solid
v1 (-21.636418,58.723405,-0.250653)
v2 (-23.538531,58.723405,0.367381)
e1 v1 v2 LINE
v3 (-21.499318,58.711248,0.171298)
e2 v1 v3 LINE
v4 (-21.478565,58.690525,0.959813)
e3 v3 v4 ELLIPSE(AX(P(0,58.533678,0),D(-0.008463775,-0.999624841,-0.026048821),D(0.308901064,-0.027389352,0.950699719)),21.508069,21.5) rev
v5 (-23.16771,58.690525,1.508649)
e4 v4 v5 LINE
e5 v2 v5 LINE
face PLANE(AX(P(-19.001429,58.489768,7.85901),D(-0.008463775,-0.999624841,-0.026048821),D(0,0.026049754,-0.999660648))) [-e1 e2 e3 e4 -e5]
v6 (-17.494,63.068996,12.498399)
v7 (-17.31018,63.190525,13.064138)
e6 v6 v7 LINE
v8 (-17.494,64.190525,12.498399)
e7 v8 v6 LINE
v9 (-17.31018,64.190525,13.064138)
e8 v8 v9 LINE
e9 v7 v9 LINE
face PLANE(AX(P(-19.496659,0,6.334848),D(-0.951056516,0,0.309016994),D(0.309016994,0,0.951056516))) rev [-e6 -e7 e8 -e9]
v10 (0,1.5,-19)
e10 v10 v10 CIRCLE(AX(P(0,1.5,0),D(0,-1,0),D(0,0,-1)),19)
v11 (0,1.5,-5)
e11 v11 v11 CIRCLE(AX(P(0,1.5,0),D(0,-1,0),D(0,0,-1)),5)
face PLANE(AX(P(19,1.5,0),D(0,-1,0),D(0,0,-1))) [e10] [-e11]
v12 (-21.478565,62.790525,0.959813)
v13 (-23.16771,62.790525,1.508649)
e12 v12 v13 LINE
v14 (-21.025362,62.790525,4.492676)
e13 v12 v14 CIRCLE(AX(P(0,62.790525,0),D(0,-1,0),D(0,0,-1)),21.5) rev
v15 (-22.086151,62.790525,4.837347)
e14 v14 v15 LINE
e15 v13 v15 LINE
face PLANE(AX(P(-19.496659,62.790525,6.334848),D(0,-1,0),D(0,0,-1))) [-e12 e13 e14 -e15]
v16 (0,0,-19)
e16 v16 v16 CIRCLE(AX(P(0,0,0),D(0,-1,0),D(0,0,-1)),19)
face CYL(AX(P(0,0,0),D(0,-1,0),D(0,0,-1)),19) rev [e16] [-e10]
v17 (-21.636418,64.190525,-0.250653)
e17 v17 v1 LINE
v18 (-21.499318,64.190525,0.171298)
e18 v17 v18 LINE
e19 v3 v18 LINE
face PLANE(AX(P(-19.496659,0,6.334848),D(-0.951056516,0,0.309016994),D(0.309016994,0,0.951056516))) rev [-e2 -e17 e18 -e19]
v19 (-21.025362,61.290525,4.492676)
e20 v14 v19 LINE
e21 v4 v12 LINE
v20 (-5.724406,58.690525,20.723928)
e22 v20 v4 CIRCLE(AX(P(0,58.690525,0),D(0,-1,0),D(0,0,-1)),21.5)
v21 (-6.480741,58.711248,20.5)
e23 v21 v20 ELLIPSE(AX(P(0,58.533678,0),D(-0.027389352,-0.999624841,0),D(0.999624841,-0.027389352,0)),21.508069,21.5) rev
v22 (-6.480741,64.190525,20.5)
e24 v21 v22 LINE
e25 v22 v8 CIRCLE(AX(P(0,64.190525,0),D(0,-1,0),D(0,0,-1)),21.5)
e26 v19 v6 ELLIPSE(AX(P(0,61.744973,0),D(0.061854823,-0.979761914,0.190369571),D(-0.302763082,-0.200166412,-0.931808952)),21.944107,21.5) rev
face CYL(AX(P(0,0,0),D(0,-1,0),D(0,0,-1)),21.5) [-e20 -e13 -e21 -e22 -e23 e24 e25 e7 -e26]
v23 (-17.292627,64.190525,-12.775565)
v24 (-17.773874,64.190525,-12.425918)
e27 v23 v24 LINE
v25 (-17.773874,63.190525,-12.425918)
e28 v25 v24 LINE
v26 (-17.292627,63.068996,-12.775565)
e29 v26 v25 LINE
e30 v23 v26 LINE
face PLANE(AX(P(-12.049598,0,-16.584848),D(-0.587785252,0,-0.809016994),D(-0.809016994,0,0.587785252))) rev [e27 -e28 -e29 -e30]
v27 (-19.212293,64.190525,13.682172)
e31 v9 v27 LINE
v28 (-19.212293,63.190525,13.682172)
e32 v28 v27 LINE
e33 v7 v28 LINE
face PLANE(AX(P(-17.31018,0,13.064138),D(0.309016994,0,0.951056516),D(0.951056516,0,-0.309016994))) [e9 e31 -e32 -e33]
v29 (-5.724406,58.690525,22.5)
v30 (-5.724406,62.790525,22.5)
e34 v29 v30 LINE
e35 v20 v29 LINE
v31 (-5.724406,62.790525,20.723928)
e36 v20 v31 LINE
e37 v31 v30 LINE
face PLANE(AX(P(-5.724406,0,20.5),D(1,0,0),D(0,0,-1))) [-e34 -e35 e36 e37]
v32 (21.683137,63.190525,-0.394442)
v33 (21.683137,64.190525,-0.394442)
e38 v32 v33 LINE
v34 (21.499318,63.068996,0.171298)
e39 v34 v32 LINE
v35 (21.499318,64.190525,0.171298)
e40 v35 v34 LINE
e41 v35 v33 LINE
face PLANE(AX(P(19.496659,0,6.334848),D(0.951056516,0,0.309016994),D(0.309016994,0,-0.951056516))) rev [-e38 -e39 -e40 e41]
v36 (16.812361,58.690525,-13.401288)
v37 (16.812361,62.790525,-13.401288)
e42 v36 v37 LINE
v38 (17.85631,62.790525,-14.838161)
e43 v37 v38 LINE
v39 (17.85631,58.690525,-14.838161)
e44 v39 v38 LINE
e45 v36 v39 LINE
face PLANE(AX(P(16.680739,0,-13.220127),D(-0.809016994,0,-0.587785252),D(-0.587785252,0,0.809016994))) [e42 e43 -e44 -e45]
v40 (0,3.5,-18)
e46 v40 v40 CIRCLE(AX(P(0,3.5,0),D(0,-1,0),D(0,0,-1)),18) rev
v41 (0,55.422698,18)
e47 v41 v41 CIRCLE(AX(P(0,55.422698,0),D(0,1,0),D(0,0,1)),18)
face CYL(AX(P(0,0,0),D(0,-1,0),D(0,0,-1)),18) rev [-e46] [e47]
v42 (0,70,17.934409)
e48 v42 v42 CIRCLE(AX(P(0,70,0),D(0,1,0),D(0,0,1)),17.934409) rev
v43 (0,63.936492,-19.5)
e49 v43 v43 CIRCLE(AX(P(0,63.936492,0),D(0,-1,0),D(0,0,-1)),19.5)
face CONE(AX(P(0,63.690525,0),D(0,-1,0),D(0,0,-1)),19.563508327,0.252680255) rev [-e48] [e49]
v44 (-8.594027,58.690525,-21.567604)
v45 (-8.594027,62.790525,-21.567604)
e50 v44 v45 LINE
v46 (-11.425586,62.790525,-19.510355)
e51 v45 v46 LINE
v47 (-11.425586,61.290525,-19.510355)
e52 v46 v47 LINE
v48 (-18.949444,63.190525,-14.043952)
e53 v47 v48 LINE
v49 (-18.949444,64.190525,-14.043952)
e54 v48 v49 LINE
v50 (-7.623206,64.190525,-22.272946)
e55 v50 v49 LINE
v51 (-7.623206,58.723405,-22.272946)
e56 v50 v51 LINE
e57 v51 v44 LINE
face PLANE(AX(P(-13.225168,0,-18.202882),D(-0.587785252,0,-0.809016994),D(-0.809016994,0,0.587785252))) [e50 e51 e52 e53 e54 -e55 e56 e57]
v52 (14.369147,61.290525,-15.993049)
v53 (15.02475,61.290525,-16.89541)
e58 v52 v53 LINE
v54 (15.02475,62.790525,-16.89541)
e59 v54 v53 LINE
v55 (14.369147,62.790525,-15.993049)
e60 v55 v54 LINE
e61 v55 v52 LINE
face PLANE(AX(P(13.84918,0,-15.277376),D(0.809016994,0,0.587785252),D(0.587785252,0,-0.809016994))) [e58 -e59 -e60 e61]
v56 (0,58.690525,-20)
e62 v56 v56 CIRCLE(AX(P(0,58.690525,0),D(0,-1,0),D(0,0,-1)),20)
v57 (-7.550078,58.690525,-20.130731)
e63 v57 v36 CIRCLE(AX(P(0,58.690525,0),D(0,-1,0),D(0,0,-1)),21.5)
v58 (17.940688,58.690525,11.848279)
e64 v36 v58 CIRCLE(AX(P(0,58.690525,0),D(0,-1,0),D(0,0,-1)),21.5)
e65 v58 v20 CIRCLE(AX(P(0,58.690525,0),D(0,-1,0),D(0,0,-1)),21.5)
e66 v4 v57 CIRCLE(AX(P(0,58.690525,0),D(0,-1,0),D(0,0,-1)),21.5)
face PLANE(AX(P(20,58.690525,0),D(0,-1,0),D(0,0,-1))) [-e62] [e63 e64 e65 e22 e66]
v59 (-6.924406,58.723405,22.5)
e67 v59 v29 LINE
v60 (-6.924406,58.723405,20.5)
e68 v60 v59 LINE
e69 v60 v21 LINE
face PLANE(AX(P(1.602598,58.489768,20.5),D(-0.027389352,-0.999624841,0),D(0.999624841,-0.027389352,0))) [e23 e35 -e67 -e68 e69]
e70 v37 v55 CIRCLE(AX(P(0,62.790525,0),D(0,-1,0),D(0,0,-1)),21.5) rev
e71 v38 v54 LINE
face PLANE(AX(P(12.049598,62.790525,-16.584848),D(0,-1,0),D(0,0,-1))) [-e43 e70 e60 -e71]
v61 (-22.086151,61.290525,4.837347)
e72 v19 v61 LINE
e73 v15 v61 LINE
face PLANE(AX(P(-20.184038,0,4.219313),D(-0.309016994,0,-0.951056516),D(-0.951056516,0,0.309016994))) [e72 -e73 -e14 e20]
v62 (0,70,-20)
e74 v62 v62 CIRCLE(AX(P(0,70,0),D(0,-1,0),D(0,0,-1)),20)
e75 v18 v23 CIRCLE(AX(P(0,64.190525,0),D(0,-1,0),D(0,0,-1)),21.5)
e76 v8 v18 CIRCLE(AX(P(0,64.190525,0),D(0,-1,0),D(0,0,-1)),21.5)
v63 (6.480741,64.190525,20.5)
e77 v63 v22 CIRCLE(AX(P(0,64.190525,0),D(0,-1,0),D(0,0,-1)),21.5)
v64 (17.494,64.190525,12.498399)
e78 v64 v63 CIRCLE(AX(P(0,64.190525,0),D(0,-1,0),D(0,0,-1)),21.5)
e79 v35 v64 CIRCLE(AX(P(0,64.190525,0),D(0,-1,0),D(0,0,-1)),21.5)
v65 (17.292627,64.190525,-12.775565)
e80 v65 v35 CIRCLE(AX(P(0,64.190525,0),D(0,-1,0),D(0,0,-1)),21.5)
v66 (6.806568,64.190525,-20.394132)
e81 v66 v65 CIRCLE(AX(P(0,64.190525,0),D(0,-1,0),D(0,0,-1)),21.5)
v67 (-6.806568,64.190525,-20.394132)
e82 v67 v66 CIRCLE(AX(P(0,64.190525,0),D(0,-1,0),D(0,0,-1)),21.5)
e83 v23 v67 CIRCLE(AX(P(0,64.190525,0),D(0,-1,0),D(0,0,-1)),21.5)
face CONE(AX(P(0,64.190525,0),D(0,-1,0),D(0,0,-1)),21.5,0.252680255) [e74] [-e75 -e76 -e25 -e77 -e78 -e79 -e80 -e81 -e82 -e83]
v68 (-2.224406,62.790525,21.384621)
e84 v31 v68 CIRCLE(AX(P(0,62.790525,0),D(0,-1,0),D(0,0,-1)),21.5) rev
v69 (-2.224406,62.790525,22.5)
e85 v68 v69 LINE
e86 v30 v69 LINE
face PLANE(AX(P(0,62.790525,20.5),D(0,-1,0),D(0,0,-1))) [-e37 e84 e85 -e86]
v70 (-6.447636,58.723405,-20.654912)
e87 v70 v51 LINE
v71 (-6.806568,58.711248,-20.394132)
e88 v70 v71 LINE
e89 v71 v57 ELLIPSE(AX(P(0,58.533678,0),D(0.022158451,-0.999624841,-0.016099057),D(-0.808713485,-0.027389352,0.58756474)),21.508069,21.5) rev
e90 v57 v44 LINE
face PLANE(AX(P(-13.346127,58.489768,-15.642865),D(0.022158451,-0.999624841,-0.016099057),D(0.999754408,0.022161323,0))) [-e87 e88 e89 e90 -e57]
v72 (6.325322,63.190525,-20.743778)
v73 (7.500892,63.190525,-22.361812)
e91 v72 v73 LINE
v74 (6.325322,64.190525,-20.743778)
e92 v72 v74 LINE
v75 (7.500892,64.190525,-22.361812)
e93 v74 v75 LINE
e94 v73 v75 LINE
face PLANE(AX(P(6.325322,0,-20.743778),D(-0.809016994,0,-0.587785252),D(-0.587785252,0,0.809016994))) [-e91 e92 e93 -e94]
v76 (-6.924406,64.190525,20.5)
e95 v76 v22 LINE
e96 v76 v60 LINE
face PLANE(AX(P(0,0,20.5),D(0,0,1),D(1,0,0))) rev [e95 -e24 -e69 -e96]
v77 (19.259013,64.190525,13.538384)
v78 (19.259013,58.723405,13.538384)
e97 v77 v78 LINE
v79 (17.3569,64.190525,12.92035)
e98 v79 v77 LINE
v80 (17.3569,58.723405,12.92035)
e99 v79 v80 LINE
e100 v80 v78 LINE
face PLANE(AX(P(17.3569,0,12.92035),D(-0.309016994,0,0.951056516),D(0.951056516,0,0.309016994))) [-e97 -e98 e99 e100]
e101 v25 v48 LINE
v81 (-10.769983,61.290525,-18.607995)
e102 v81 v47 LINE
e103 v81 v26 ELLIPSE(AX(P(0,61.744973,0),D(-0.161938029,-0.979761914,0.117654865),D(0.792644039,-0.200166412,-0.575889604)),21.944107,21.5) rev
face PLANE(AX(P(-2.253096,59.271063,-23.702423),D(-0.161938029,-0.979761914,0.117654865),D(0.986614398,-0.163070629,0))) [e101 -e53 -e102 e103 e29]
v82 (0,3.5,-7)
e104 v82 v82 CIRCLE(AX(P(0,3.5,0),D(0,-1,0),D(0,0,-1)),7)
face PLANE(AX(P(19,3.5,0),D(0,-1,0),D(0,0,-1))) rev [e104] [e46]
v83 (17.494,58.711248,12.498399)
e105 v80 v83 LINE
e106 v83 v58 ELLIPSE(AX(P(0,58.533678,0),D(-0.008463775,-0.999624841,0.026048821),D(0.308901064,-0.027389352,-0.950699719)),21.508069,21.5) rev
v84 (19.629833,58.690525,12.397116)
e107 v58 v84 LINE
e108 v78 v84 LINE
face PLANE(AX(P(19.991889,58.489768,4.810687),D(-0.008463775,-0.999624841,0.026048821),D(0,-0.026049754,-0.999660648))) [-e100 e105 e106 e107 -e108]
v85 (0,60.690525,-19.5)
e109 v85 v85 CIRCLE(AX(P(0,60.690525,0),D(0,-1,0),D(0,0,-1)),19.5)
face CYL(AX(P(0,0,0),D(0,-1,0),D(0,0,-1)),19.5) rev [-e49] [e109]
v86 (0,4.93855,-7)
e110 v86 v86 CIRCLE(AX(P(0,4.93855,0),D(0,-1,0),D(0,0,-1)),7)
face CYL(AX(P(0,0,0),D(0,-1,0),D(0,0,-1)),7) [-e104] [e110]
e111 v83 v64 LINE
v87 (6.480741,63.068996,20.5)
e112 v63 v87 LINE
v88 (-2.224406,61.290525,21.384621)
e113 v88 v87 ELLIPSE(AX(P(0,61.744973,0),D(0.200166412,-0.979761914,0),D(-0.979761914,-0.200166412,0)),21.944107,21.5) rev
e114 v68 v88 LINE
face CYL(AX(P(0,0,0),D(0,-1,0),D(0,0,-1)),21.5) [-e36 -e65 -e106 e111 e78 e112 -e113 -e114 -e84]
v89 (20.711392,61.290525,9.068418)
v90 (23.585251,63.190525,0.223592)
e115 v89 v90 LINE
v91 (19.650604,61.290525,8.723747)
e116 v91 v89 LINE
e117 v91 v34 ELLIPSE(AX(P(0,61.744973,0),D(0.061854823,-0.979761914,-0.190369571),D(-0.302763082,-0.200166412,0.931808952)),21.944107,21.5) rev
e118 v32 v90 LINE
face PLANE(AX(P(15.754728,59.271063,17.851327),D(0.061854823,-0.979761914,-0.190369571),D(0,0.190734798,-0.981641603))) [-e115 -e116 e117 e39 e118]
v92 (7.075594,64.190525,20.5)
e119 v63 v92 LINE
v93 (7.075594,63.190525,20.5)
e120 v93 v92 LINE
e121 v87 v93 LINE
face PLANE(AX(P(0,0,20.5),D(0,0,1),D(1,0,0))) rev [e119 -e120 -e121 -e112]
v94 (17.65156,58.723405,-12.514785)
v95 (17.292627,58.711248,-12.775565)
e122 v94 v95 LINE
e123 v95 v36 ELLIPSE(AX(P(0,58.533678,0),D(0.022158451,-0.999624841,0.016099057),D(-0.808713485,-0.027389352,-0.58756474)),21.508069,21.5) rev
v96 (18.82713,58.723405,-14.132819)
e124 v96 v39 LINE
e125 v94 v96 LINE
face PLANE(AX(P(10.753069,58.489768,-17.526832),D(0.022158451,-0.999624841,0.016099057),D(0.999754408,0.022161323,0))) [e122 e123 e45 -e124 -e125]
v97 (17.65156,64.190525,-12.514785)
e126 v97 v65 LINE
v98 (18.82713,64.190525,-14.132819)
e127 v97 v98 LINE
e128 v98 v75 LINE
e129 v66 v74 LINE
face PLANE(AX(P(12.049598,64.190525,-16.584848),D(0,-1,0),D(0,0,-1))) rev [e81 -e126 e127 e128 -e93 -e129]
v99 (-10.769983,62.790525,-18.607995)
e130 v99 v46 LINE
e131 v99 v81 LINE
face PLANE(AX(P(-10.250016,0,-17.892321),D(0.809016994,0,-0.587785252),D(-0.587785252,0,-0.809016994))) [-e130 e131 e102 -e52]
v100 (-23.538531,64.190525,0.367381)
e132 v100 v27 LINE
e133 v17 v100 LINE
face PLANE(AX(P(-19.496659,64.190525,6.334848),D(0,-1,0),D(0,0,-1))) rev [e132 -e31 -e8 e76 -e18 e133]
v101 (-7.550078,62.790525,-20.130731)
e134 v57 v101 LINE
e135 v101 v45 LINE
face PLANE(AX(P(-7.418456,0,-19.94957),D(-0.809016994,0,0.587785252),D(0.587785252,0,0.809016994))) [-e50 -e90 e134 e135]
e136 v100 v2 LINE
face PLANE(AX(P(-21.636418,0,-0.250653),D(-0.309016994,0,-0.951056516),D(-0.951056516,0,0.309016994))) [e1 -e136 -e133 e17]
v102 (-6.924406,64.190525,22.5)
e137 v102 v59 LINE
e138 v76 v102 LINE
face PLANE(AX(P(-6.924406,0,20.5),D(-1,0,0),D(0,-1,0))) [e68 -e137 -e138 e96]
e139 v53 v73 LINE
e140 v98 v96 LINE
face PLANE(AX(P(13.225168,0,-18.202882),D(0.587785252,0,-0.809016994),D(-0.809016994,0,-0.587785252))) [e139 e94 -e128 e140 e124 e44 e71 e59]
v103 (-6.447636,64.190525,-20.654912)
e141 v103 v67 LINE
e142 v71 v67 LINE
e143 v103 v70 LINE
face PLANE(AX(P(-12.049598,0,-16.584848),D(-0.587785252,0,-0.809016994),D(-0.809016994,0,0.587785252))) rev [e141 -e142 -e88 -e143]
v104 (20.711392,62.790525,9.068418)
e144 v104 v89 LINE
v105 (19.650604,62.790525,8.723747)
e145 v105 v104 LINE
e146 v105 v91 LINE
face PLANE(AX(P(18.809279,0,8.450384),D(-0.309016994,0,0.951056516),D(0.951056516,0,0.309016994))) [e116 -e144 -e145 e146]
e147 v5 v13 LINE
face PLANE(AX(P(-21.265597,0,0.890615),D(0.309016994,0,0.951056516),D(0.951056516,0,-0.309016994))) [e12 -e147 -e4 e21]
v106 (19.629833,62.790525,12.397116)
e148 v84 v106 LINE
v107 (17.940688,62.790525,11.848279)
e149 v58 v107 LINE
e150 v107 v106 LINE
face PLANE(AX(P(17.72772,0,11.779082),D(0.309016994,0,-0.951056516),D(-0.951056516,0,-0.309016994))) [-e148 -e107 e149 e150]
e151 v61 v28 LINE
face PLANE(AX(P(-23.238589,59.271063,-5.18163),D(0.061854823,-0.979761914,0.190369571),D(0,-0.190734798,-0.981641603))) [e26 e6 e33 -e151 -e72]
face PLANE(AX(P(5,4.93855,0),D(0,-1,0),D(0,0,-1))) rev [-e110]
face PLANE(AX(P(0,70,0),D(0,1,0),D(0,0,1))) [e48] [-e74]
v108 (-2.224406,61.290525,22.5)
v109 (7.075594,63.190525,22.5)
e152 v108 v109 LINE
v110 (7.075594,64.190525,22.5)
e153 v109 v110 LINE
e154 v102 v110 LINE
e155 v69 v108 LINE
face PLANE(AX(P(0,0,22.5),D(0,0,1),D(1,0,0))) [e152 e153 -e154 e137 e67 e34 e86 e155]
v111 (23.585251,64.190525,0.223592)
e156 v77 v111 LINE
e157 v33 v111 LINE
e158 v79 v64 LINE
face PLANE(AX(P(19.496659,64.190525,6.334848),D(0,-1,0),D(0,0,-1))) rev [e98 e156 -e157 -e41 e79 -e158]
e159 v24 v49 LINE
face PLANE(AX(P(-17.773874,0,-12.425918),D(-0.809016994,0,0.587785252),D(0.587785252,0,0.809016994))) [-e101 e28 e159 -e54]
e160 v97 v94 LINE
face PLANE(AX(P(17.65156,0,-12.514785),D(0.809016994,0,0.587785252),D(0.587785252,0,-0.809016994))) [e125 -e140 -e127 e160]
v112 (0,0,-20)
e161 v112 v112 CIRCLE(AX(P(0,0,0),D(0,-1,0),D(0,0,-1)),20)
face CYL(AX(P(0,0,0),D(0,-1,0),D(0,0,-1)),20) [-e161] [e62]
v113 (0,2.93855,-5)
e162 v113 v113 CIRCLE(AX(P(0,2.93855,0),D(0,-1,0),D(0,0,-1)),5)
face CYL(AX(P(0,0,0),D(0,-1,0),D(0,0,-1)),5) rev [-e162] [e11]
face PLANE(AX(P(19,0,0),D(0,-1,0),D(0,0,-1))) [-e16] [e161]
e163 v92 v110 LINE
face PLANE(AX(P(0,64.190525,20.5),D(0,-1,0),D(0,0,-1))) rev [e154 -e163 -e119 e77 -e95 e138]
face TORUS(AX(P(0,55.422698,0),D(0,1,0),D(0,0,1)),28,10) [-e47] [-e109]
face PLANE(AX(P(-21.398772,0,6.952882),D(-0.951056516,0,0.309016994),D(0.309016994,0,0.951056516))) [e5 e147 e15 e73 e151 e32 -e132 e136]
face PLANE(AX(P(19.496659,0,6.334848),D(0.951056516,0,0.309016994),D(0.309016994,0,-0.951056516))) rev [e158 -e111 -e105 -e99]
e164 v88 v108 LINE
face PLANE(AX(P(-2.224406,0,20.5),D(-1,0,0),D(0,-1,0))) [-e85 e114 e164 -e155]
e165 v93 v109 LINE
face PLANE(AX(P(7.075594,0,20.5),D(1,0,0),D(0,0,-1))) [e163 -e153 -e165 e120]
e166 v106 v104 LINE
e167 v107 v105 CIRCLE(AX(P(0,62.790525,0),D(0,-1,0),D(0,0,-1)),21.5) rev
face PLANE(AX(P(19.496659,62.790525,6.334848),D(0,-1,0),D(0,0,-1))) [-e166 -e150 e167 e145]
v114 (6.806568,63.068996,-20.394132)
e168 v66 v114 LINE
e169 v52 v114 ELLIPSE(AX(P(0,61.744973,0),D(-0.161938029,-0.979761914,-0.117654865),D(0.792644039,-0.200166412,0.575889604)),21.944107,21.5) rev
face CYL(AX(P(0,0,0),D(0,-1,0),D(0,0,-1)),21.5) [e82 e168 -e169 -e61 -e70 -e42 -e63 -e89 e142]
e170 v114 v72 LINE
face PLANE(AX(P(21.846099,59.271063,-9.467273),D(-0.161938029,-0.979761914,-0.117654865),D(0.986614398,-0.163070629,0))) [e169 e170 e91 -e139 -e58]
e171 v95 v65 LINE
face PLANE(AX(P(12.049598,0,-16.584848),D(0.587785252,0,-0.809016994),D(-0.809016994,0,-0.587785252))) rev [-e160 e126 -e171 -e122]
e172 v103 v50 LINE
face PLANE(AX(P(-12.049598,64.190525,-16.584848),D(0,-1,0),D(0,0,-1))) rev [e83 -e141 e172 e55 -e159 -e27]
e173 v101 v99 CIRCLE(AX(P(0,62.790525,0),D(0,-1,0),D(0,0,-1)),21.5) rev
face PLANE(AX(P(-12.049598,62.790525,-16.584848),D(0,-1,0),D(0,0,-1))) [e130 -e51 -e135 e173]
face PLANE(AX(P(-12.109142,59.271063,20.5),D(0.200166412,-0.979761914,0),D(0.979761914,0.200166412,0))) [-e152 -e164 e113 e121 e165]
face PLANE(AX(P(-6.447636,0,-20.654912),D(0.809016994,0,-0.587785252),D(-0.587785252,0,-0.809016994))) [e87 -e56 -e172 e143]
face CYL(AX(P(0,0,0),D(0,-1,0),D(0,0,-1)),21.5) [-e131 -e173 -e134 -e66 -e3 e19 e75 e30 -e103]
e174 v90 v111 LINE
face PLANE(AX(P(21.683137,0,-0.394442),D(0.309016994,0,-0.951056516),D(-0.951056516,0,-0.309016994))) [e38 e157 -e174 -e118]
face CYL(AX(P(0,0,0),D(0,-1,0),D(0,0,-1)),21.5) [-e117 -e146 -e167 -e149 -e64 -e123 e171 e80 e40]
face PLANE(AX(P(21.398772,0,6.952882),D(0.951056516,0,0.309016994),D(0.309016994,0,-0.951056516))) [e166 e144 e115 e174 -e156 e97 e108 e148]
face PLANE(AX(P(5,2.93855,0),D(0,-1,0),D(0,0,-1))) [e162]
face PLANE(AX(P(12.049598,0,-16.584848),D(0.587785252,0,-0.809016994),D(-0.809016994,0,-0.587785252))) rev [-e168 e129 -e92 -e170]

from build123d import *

# Parameters (mm, degrees)
SHELL5_T            = -2
FILLET1_R           = 10
BOSS_EXTRUDE1_DEPTH = 1
CIRPATTERN1_COUNT   = 5


with BuildPart() as part:
    # Sketch1 → Revolve1 (revolve)
    with BuildSketch(Plane.XY, mode=Mode.PRIVATE) as revolve1_sk:
        Polygon((20, 0), (20, 58.690524981), (21.5, 58.690524981), (21.5, 64.190524981), (20, 70), (0, 70), (0, 2.938550041), (5, 2.938550041), (5, 1.5), (19, 1.5), (19, 0), align=None)
    revolve(revolve1_sk.sketch.rotate(Axis((0, 0, 0), (0, 1, 0)), 90), axis=Axis((0, 0, 0), (0, 1, 0)))

    # Shell5
    shell5_openings = [part.faces().sort_by_distance(p)[0] for p in [
        (0, 70, 0),
    ]]
    offset(amount=SHELL5_T, openings=shell5_openings, kind=Kind.INTERSECTION)

    # Fillet1
    # the kernel refuses this fillet: 10 mm, written as the material it takes off along each edge
    with BuildSketch(Plane(origin=(0, 60.690524981, 0), x_dir=(0, 0, -1), z_dir=(1, 0, 0))) as fillet1_piece_1:
        with BuildLine():
            CenterArc((28, -5.267826876), FILLET1_R, 148.211669383, 31.788330617)
            Line((19.5, 0), (19.33, 0.105356538))
            ThreePointArc((19.33, 0.105356538), (18.75, 0.2), (18, 0.2))
            Line((18, 0.2), (17.8, 0))
            Line((17.8, 0), (17.8, -5.267826876))
            Line((17.8, -5.267826876), (18, -5.267826876))
        make_face()
    revolve(axis=Axis((0, 60.690524981, 0), (0, 1, 0)), mode=Mode.SUBTRACT)

    # Sketch4 → Boss-Extrude1 (add, symmetric)
    with BuildSketch(Plane.XY.offset(21.5)):
        Polygon((-2.224405673, 61.290524981), (7.075594327, 63.190524981), (7.075594327, 64.190524981), (-6.924405673, 64.190524981), (-6.924405673, 58.723404538), (-5.724405673, 58.690524981), (-5.724405673, 62.790524981), (-2.224405673, 62.790524981), align=None)
    boss_extrude1 = extrude(amount=BOSS_EXTRUDE1_DEPTH, both=True)

    # CirPattern1: Boss-Extrude1 ×5 about axis
    cirpattern1_axis = Axis((0, 0, 0), (0, 1, 0))
    for i in range(1, CIRPATTERN1_COUNT):
        add(boss_extrude1.rotate(cirpattern1_axis, i * 360 / CIRPATTERN1_COUNT))


solid = part.part
